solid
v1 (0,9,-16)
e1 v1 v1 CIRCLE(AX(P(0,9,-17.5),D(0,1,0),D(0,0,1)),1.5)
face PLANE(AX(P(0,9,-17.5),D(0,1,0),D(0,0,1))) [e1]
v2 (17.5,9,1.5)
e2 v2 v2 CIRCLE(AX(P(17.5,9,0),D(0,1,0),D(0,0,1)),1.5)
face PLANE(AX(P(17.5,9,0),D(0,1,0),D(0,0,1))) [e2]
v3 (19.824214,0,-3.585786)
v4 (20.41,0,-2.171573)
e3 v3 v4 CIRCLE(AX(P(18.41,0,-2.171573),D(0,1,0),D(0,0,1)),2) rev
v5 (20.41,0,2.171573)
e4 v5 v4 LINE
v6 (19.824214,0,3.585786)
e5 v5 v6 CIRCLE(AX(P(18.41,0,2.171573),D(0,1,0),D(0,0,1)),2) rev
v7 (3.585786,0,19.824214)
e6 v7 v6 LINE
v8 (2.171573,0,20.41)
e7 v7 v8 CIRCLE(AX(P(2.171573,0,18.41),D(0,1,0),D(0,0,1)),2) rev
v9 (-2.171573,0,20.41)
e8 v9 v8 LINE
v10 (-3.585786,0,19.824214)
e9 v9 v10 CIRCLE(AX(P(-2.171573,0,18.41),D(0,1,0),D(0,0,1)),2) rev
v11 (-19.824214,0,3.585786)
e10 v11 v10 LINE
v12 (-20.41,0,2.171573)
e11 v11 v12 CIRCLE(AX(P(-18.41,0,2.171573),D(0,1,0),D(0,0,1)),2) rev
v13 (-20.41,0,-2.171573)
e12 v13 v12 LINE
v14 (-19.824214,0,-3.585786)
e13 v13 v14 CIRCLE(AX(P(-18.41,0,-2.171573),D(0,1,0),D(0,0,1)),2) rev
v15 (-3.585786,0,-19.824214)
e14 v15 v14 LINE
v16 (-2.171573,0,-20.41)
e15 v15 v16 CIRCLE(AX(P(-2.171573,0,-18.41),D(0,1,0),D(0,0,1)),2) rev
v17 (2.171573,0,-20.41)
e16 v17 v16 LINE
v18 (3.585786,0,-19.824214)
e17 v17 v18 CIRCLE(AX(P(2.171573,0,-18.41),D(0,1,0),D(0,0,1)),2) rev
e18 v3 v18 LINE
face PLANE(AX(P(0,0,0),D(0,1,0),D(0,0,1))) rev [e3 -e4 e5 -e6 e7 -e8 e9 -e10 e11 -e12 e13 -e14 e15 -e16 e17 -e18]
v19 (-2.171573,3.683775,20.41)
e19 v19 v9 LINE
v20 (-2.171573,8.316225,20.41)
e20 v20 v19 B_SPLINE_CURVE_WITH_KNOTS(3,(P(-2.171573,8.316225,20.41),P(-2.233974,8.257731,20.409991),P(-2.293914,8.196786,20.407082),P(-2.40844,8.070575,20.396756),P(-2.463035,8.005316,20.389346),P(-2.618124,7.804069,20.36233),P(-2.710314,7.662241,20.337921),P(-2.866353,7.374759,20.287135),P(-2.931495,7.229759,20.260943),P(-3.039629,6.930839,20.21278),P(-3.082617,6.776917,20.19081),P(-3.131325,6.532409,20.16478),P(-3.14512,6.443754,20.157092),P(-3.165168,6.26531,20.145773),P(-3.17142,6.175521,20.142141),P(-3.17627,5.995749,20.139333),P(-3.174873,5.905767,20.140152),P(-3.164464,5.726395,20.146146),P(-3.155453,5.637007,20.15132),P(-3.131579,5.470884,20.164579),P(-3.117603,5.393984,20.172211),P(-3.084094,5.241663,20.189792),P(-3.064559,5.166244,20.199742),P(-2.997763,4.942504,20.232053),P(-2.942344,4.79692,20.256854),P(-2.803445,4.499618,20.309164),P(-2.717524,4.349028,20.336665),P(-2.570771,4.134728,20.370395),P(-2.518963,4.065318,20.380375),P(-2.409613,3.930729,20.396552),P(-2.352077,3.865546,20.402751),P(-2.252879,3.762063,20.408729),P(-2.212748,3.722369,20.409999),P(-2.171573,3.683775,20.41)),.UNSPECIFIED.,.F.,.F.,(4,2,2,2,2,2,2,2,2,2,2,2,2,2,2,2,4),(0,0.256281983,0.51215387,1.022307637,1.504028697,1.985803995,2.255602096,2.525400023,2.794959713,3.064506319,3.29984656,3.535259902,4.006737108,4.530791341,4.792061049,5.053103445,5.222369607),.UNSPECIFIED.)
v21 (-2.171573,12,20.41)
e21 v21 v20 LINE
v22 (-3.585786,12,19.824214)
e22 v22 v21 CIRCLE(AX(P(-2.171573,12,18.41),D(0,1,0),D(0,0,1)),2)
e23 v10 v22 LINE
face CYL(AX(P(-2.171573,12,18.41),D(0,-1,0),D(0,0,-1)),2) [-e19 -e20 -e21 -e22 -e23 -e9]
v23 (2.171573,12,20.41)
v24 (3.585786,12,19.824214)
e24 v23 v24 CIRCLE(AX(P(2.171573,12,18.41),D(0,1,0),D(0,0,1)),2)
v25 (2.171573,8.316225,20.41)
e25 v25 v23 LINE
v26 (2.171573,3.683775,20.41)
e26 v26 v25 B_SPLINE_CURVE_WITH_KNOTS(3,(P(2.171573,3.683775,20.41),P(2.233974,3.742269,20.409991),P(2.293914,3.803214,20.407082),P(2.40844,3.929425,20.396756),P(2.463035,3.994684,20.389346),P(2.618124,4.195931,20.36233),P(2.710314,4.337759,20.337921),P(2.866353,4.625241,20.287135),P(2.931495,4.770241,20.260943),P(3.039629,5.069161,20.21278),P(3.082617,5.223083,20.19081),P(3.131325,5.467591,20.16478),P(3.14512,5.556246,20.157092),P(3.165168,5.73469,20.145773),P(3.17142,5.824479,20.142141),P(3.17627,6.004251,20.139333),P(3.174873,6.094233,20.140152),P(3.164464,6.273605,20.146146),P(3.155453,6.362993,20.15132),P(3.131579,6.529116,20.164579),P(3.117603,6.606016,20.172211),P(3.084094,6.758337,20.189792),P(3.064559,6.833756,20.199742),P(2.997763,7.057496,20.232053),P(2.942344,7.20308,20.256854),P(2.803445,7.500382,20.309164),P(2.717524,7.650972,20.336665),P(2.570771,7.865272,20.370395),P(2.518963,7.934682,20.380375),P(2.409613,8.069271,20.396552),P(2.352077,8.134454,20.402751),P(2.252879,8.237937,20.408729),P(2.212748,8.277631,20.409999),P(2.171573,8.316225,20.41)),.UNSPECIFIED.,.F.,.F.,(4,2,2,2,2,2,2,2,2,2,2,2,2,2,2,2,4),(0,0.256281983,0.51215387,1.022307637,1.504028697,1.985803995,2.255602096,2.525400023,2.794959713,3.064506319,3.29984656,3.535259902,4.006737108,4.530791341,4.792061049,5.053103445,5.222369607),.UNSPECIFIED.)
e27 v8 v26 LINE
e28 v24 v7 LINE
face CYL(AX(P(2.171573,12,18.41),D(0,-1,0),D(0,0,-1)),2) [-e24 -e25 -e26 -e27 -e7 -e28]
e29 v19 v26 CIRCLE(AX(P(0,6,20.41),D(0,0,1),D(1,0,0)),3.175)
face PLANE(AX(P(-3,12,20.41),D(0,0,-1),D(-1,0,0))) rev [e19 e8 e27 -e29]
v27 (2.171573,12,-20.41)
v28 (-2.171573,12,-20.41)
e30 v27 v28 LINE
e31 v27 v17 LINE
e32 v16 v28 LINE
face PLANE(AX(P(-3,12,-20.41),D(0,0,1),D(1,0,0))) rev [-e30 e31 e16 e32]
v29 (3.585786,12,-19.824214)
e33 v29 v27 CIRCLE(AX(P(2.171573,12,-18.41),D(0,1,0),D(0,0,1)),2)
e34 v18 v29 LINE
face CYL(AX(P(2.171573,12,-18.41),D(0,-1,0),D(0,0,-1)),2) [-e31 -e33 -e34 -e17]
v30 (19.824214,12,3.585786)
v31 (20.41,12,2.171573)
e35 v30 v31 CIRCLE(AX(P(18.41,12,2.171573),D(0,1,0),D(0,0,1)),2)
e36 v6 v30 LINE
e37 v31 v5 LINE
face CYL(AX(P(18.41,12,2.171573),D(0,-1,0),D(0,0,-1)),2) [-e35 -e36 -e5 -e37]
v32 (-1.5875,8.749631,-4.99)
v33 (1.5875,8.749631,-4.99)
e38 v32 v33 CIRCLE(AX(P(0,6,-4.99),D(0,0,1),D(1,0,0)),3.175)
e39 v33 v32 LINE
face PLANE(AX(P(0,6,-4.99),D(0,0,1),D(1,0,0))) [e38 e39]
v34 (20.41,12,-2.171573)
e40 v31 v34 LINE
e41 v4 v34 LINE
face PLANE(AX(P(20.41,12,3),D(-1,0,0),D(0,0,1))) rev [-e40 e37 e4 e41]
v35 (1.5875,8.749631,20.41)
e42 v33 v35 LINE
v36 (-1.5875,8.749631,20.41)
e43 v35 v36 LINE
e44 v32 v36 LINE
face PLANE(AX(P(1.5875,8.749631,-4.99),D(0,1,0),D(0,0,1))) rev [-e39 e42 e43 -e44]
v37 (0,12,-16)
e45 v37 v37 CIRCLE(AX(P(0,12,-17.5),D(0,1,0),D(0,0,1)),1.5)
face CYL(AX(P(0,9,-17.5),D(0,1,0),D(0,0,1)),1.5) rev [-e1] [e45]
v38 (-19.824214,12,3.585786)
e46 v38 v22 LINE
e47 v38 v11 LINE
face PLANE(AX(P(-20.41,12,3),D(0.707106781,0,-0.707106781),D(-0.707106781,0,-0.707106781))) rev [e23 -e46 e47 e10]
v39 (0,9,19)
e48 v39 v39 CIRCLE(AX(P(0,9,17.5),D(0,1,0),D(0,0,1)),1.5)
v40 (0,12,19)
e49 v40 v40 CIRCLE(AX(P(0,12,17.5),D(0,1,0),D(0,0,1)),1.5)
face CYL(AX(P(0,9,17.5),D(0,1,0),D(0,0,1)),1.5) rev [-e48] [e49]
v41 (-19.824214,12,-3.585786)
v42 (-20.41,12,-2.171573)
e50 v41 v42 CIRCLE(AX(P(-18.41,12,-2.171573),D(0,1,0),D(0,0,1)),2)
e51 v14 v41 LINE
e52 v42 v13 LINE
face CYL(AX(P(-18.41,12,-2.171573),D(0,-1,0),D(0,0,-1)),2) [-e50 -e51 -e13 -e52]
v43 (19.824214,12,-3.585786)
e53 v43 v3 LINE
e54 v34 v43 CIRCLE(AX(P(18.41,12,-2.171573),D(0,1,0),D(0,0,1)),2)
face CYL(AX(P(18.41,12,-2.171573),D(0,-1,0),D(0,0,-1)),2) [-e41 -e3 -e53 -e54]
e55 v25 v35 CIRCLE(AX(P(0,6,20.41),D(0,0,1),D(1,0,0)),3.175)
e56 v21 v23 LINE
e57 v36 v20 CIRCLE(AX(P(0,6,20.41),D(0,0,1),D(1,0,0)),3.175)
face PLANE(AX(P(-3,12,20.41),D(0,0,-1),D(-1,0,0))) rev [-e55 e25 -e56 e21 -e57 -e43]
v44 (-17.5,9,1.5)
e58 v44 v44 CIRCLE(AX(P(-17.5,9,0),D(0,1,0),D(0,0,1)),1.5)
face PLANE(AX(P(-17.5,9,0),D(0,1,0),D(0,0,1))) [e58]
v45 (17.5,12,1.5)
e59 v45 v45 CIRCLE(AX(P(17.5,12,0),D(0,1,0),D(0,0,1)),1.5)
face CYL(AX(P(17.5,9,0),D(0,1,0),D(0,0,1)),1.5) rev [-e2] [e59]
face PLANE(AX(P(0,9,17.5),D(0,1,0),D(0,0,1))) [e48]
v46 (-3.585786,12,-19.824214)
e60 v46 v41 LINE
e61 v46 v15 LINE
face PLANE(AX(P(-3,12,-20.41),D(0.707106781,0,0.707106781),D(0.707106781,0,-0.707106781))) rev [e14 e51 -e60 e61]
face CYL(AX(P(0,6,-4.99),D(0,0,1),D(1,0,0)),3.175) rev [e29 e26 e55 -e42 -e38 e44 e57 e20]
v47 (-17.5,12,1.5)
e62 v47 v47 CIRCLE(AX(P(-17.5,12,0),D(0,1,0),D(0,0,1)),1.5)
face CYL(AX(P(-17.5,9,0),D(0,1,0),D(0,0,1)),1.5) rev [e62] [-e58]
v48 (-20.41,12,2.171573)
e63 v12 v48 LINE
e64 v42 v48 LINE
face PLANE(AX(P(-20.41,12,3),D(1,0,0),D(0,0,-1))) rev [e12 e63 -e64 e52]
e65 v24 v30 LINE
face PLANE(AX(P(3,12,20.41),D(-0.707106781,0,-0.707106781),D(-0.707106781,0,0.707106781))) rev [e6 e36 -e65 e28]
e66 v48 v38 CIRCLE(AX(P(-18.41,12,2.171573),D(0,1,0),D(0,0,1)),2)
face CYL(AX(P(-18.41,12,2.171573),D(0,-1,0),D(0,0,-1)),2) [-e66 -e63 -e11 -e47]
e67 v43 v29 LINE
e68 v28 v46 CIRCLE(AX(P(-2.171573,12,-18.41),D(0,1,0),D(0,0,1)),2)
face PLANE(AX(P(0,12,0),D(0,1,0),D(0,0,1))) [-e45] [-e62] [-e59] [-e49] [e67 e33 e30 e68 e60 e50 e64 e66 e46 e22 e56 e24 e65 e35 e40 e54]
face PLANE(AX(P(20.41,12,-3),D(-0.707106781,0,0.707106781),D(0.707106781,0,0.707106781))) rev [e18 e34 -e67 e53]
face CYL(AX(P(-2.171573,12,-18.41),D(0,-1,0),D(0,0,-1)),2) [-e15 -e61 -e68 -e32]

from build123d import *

# Parameters (mm, degrees)
BOSS_EXTRUDE1_DEPTH = 12
SKETCH3_R           = 1.5
CUT_EXTRUDE1_DEPTH  = 3
CUT_EXTRUDE2_DEPTH  = 25.4
FILLET1_R           = 2


with BuildPart() as part:
    # Sketch1 → Boss-Extrude1 (new body)
    with BuildSketch(Plane(origin=(0, 0, 0), x_dir=(1, 0, 0), z_dir=(0, 1, 0))):
        Polygon((-3, -20.41), (3, -20.41), (20.41, -3), (20.41, 3), (3, 20.41), (-3, 20.41), (-20.41, 3), (-20.41, -3), align=None)
    extrude(amount=BOSS_EXTRUDE1_DEPTH)

    # Sketch3 → Cut-Extrude1 (cut)
    with BuildSketch(Plane(origin=(0, 12, 0), x_dir=(1, 0, 0), z_dir=(0, 1, 0))):
        with Locations(Location((17.5, 0, 0), (0, 0, 270))):
            Circle(SKETCH3_R)
        with Locations(Location((0, -17.5, 0), (0, 0, 270))):
            Circle(SKETCH3_R)
        with Locations(Location((-17.5, 0, 0), (0, 0, 270))):
            Circle(SKETCH3_R)
        with Locations(Location((0, 17.5, 0), (0, 0, 270))):
            Circle(SKETCH3_R)
    extrude(amount=-CUT_EXTRUDE1_DEPTH, mode=Mode.SUBTRACT)

    # Sketch2 → Cut-Extrude2 (cut)
    with BuildSketch(Plane.XY.offset(20.41)):
        with BuildLine():
            Line((1.5875, 8.749630657), (-1.5875, 8.749630657))
            ThreePointArc((-1.5875, 8.749630657), (0, 2.825), (1.5875, 8.749630657))
        make_face()
    extrude(amount=-CUT_EXTRUDE2_DEPTH, mode=Mode.SUBTRACT)

    # Fillet1
    # the kernel refuses this fillet: 2 mm, written as the material it takes off along each edge
    with BuildSketch(Plane(origin=(20.41, -2.071067812, -3), x_dir=(0, 0, 1), z_dir=(0, 1, 0)), Plane(origin=(20.41, -2.071067812, 3), x_dir=(-0.7071067811865513, 0, 0.7071067811865438), z_dir=(0, 1, 0)), Plane(origin=(-20.41, -2.071067812, -3), x_dir=(0.7071067811865451, 0, -0.70710678118655), z_dir=(0, 1, 0)), Plane(origin=(-3, -2.071067812, -20.41), x_dir=(1, 0, 0), z_dir=(0, 1, 0)), Plane(origin=(3, -2.071067812, -20.41), x_dir=(0.7071067811865518, 0, 0.7071067811865432), z_dir=(0, 1, 0))) as fillet1_piece_1:
        with BuildLine():
            CenterArc((FILLET1_R * 0.414213562373, -FILLET1_R), FILLET1_R, 90, 45)
            Line((-FILLET1_R * 0.292893218813, -FILLET1_R * 0.292893218813), (0, 0))
            Line((0, 0), (FILLET1_R * 0.414213562373, 0))
        make_face()
    extrude(amount=16.142135624, mode=Mode.SUBTRACT)
    with BuildSketch(Plane(origin=(3, 4.968463332, 20.41), x_dir=(0.7071067811865491, 0, -0.7071067811865459), z_dir=(0, 1, 0)), Plane(origin=(-3, -2.071067812, 20.41), x_dir=(1, 0, 0), z_dir=(0, 1, 0))) as fillet1_piece_2:
        with BuildLine():
            CenterArc((FILLET1_R * 0.414213562373, FILLET1_R), FILLET1_R, 225, 45)
            Line((-FILLET1_R * 0.292893218813, FILLET1_R * 0.292893218813), (0, 0))
            Line((0, 0), (FILLET1_R * 0.414213562373, 0))
        make_face()
    extrude(amount=9.102604479, mode=Mode.SUBTRACT)
    with BuildSketch(Plane(origin=(-3, 4.968463332, 20.41), x_dir=(-0.7071067811865411, 0, -0.707106781186554), z_dir=(0, 1, 0)), Plane(origin=(3, -2.071067812, 20.41), x_dir=(-1, 0, 0), z_dir=(0, 1, 0))) as fillet1_piece_3:
        with BuildLine():
            CenterArc((FILLET1_R * 0.414213562373, -FILLET1_R), FILLET1_R, 90, 45)
            Line((-FILLET1_R * 0.292893218813, -FILLET1_R * 0.292893218813), (0, 0))
            Line((0, 0), (FILLET1_R * 0.414213562373, 0))
        make_face()
    extrude(amount=9.102604479, mode=Mode.SUBTRACT)
    with BuildSketch(Plane(origin=(-20.41, -2.071067812, 3), x_dir=(0.7071067811865429, 0, 0.7071067811865521), z_dir=(0, 1, 0))) as fillet1_piece_4:
        with BuildLine():
            CenterArc((FILLET1_R * 0.414213562373, FILLET1_R), FILLET1_R, 225, 45)
            Line((-FILLET1_R * 0.292893218813, FILLET1_R * 0.292893218813), (0, 0))
            Line((0, 0), (FILLET1_R * 0.414213562373, 0))
        make_face()
    extrude(amount=16.142135624, mode=Mode.SUBTRACT)


solid = part.part
